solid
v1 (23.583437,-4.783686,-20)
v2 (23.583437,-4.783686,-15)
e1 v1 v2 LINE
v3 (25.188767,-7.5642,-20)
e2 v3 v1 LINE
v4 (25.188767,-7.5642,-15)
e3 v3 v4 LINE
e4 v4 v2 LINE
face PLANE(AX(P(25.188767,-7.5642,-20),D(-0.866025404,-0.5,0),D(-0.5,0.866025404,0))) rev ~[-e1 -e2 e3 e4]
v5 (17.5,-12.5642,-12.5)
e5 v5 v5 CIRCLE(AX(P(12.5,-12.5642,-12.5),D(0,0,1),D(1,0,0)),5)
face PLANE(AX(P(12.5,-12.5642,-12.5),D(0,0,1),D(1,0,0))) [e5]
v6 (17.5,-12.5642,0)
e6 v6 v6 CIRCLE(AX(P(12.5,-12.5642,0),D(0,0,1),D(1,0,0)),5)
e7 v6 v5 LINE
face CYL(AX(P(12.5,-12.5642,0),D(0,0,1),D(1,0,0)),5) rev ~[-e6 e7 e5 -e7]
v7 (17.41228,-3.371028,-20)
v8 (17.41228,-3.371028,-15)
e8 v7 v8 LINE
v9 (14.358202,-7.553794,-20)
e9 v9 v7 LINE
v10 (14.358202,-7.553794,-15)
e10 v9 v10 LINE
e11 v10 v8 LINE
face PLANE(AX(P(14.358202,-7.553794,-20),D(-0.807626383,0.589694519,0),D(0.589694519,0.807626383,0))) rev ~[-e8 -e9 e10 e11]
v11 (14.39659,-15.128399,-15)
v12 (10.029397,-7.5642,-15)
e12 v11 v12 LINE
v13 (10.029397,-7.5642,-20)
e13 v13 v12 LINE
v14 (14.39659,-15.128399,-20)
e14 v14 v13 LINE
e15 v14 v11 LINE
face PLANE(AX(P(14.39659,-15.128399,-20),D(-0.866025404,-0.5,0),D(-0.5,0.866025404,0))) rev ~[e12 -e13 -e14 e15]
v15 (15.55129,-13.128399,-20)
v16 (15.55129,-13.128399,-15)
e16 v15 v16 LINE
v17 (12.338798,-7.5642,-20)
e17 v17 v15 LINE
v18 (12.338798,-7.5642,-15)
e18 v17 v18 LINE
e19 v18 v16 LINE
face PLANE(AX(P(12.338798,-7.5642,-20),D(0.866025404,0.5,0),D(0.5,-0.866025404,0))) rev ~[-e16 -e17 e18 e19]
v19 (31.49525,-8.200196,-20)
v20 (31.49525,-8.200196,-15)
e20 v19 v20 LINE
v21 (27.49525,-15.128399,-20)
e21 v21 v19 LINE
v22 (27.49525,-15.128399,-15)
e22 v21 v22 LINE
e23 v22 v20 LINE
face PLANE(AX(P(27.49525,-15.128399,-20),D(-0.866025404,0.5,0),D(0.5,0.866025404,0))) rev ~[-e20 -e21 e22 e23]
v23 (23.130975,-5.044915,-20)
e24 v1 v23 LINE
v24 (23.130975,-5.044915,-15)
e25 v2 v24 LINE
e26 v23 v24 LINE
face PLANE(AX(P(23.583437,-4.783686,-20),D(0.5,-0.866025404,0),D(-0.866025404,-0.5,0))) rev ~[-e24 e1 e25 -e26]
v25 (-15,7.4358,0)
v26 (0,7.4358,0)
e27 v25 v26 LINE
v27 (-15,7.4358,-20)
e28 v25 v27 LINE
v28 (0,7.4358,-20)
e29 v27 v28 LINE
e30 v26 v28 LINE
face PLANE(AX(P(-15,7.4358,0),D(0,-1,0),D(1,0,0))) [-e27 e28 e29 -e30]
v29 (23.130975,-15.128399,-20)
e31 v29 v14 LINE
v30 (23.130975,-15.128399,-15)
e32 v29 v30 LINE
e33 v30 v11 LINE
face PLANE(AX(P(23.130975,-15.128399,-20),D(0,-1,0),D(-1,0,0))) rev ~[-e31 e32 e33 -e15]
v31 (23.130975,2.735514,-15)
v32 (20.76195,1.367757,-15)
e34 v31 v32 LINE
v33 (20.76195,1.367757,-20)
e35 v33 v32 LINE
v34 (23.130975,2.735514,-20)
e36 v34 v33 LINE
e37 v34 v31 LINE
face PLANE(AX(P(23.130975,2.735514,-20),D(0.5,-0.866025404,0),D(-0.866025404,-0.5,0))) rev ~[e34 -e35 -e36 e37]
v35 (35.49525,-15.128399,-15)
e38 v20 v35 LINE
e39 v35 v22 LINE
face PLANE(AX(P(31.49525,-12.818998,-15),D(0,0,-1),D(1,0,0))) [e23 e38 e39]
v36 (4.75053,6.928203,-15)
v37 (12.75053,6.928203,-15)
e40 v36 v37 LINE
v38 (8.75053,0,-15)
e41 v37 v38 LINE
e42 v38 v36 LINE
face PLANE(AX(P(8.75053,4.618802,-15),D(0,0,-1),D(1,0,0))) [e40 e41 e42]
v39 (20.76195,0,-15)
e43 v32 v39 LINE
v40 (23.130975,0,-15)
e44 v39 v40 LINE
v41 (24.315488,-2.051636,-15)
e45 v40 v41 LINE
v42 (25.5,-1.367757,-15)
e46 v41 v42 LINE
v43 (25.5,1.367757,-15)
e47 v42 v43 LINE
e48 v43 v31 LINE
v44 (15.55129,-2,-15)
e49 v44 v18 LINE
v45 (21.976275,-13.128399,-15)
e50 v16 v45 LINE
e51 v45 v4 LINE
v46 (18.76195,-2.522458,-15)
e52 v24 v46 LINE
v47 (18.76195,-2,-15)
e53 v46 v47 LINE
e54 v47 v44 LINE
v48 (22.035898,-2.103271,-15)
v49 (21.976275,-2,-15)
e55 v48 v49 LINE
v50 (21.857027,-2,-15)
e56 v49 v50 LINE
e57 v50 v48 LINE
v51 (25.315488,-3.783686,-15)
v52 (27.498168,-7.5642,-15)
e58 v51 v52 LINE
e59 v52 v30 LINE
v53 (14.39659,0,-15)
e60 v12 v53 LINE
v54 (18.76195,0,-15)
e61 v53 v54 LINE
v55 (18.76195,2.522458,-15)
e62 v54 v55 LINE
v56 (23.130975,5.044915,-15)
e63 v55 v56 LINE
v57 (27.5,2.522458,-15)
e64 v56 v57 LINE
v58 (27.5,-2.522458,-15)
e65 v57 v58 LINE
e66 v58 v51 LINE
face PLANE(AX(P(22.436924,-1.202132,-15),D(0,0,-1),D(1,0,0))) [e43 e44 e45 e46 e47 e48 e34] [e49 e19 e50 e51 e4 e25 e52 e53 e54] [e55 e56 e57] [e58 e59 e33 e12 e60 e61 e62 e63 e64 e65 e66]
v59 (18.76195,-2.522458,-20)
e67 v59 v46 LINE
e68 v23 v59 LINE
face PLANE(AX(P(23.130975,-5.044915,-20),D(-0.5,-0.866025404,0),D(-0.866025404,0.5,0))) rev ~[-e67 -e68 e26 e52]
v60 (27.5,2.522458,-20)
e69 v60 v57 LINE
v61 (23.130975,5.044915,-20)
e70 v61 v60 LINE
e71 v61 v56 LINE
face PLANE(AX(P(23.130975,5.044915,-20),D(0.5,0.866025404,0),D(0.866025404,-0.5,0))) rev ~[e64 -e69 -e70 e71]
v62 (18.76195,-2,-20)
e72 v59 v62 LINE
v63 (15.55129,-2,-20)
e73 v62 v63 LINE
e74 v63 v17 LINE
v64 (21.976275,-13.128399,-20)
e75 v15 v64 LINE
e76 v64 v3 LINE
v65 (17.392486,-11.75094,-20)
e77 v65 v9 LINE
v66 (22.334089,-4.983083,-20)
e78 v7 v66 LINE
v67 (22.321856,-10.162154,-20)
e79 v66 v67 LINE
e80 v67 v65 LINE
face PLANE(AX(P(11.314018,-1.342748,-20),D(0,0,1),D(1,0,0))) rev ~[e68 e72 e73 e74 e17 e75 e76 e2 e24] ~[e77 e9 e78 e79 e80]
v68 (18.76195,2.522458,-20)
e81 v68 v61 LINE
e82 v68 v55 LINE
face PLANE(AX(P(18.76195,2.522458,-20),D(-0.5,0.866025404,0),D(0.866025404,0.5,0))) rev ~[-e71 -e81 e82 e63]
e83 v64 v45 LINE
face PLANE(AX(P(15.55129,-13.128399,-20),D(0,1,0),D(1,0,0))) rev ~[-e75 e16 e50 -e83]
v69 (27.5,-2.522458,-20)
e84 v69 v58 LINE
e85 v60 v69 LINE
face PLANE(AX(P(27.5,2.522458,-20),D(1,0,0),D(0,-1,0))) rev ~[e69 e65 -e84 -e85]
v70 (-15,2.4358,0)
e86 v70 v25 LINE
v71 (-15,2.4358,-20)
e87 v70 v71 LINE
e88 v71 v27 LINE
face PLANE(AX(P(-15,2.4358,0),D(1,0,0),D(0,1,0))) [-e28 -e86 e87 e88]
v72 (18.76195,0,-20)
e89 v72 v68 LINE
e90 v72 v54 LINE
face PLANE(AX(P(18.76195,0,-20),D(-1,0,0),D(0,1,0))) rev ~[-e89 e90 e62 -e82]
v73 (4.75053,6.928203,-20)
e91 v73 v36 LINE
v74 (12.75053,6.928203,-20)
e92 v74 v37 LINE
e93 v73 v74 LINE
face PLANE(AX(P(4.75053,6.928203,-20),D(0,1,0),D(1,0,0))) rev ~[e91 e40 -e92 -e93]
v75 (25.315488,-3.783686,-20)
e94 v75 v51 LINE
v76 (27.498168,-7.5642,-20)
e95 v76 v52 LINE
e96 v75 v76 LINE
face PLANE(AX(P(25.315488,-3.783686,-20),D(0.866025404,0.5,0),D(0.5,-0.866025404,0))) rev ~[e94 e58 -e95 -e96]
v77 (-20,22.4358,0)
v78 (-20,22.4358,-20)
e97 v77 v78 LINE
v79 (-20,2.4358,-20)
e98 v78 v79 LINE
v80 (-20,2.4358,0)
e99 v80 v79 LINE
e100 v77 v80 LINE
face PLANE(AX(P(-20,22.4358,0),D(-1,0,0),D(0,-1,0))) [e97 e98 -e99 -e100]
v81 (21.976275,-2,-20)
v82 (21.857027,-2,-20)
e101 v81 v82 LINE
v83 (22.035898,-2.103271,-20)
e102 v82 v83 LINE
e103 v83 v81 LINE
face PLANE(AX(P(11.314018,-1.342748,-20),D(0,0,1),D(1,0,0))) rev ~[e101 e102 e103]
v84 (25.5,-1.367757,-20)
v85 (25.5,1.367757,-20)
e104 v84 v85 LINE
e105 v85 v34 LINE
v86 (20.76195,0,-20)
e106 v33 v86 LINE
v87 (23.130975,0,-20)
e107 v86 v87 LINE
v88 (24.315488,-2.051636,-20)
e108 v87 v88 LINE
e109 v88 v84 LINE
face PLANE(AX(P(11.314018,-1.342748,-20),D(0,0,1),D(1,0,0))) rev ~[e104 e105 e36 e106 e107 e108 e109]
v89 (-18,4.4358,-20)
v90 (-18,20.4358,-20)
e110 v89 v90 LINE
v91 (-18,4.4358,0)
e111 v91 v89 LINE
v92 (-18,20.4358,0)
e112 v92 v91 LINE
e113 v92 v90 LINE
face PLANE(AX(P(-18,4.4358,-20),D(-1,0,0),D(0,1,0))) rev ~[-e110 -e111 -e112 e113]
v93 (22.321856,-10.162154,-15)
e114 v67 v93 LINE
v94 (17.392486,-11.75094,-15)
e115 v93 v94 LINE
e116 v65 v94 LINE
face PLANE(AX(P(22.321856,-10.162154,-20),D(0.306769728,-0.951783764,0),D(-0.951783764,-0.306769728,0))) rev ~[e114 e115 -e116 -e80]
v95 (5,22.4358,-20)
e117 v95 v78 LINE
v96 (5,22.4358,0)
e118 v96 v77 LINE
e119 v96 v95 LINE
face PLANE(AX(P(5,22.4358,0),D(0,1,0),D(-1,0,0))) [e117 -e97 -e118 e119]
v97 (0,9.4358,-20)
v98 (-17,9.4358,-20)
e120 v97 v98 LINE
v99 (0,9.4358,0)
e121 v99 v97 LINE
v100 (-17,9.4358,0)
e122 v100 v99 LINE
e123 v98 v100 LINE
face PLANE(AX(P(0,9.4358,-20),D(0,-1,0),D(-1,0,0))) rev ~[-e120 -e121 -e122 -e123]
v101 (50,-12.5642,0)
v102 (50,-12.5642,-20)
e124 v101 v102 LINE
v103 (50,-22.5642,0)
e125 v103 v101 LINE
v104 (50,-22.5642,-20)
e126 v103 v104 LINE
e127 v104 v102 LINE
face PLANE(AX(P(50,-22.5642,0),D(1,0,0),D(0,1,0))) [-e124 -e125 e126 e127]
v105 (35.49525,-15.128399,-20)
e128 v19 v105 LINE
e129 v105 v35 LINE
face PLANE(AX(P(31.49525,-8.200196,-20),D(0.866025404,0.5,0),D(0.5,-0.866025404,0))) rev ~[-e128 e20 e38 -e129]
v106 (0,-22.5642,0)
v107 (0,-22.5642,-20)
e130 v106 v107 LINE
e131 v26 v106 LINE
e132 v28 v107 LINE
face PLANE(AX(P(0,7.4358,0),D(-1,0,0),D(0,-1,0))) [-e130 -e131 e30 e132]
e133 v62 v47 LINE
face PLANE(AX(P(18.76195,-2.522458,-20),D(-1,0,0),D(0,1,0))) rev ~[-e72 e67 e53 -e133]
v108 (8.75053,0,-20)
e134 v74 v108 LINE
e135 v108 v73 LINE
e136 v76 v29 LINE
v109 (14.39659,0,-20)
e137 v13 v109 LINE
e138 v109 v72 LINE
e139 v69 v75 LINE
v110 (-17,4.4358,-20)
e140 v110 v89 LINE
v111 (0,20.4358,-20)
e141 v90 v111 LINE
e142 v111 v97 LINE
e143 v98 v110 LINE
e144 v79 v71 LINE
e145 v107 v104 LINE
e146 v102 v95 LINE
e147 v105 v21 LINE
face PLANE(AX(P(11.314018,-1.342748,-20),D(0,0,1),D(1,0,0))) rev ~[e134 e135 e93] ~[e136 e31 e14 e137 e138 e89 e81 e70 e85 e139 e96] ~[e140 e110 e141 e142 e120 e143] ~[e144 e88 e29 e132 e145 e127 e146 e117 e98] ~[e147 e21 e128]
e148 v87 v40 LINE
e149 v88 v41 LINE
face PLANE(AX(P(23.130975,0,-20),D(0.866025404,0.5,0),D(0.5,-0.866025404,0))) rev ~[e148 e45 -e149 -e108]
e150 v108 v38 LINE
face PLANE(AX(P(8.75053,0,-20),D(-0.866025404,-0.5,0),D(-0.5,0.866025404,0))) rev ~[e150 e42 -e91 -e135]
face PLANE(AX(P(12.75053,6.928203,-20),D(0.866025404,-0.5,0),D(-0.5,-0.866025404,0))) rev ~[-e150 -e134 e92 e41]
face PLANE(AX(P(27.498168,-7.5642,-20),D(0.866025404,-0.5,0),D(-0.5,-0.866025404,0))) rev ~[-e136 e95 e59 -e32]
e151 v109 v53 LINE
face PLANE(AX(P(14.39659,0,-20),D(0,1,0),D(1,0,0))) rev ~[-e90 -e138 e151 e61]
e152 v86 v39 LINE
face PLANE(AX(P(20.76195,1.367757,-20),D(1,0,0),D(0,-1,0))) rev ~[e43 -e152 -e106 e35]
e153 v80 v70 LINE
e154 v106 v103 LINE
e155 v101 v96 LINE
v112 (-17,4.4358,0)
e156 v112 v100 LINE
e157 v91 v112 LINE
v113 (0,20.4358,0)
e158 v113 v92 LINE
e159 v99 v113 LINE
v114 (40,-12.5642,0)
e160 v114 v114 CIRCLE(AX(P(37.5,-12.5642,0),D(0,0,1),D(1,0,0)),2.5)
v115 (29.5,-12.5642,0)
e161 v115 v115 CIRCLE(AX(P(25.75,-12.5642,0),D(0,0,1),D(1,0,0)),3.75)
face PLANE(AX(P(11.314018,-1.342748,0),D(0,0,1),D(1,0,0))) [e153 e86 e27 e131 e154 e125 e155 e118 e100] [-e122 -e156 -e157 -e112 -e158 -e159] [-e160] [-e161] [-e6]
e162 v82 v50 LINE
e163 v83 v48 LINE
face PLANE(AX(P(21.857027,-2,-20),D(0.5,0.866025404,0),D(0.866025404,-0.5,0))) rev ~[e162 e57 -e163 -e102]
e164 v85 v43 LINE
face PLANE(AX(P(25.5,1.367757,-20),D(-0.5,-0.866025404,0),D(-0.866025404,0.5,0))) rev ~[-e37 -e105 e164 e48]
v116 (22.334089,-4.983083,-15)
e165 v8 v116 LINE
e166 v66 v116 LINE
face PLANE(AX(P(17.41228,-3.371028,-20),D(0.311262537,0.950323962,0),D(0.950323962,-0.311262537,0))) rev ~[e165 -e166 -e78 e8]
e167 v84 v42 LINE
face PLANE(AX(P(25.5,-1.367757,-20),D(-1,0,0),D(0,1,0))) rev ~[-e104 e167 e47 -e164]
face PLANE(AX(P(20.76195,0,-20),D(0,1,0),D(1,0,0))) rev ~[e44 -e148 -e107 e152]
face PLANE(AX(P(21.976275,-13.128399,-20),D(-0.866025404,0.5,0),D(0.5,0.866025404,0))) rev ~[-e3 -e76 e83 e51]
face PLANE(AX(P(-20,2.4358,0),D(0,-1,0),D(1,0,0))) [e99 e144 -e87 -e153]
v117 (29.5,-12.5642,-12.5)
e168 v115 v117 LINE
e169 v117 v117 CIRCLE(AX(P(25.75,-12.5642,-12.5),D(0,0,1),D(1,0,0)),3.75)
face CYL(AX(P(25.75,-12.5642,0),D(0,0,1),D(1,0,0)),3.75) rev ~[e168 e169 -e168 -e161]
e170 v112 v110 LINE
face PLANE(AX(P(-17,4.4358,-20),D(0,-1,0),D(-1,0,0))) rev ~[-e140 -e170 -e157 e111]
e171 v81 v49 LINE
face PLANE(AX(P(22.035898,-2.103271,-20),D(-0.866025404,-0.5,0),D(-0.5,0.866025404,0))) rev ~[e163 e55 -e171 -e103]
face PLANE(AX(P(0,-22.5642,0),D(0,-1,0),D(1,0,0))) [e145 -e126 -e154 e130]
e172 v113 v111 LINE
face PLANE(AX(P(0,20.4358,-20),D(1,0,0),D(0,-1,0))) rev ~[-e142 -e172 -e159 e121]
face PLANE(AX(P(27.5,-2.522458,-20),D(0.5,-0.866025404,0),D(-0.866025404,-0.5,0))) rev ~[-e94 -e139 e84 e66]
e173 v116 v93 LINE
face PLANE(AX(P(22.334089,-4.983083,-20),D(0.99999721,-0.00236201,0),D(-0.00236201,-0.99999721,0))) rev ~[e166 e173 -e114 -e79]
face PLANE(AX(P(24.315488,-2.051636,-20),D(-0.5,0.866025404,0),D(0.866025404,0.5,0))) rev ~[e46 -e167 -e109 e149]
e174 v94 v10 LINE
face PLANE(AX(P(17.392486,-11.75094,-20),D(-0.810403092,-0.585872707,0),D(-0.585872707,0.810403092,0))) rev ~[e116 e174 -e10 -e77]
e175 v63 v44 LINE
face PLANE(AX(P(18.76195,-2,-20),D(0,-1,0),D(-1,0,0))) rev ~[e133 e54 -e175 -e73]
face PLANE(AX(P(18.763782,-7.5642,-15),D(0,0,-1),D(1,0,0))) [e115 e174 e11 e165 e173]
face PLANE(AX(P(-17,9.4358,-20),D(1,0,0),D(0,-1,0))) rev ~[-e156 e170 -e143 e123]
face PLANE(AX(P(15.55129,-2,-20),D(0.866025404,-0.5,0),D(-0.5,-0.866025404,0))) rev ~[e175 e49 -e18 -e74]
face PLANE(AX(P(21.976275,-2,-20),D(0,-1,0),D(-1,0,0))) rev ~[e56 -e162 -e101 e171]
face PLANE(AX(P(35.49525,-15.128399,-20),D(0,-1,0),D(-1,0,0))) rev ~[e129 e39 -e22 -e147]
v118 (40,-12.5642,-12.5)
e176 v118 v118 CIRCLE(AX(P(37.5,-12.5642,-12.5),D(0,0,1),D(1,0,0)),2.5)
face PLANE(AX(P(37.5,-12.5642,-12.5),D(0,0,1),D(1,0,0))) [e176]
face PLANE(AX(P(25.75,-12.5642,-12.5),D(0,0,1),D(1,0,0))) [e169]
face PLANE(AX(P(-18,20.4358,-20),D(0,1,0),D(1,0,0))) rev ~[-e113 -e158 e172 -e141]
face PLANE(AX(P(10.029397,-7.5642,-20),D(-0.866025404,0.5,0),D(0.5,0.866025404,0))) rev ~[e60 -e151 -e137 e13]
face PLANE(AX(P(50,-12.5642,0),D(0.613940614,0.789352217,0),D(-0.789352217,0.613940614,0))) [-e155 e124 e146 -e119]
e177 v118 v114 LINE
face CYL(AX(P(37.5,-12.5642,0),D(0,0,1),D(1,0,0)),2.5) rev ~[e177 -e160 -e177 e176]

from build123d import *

# Parameters (mm, degrees)
F0_R     = 5
F0_R_2   = 3.75
F0_R_3   = 2.5
F1_DEPTH = 20
F2_DEPTH = 12.5
F4_DEPTH = 5
F5_DEPTH = 20.001


with BuildPart() as f1:
    # F0 (on Top) → F1 (new body)
    with BuildSketch(Plane.XY):
        Polygon((0, 7.4358002841), (0, -22.5641997159), (50, -22.5641997159), (50, -12.5641997159), (5, 22.4358002841), (-20, 22.4358002841), (-20, 2.4358002841), (-15, 2.4358002841), (-15, 7.4358002841), align=None)
        with Locations((12.5, -12.5641997159)):
            Circle(F0_R, mode=Mode.SUBTRACT)
        with Locations((25.75, -12.5641997159)):
            Circle(F0_R_2, mode=Mode.SUBTRACT)
        with Locations((37.5, -12.5641997159)):
            Circle(F0_R_3, mode=Mode.SUBTRACT)
        with Locations((12.5, -12.5641997159)):
            Circle(F0_R)
        with Locations((25.75, -12.5641997159)):
            Circle(F0_R_2)
        with Locations((37.5, -12.5641997159)):
            Circle(F0_R_3)
    extrude(amount=-F1_DEPTH)

    # F0 (on Top) → F2 (cut, symmetric)
    with BuildSketch(Plane.XY):
        with Locations((12.5, -12.5641997159)):
            Circle(F0_R)
        with Locations((25.75, -12.5641997159)):
            Circle(F0_R_2)
        with Locations((37.5, -12.5641997159)):
            Circle(F0_R_3)
    extrude(amount=F2_DEPTH, both=True, mode=Mode.SUBTRACT)

    # F3 (on face) → F4 (cut)
    with BuildSketch(Plane(origin=(0, 0, -20), x_dir=(1, 0, 0), z_dir=(0, 0, -1))):
        Polygon((20.7619503973, 0), (23.1309751987, 0), (24.3154875993, 2.0516356601), (23.1309751987, 2.7355142135), (22.0358983849, 2.1032713203), (21.9762746603, 2), (21.8570272111, 2), (20.7619503973, 1.3677571068), align=None)
        Polygon((20.7619503973, -1.3677571068), (20.7619503973, 0), (18.7619503973, 0), (18.7619503973, -2.5224576451), (23.1309751987, -5.0449152903), (27.5, -2.5224576451), (27.5, 2.5224576451), (25.3154875993, 3.7836864677), (24.3154875993, 2.0516356601), (25.5, 1.3677571068), (25.5, -1.3677571068), (23.1309751987, -2.7355142135), align=None)
        Polygon((18.7619503973, 0), (20.7619503973, 0), (20.7619503973, 1.3677571068), (21.8570272111, 2), (18.7619503973, 2), align=None)
        Polygon((23.1309751987, 2.7355142135), (24.3154875993, 2.0516356601), (25.3154875993, 3.7836864677), (23.5834367918, 4.7836864677), (22.0358983849, 2.1032713203), align=None)
        Polygon((14.3965897144, 0), (18.7619503973, 0), (18.7619503973, 2), (15.5512902527, 2), (12.338798049, 7.5641997159), (15.5512902527, 13.1283994317), (21.9762746603, 13.1283994317), (25.1887668641, 7.5641997159), (23.5834367918, 4.7836864677), (25.3154875993, 3.7836864677), (27.4981679408, 7.5641997159), (23.1309751987, 15.1283994317), (14.3965897144, 15.1283994317), (10.0293969722, 7.5641997159), align=None)
        Polygon((18.7619503973, 2.5224576451), (18.7619503973, 2), (21.8570272111, 2), (22.0358983849, 2.1032713203), (23.5834367918, 4.7836864677), (23.1309751987, 5.0449152903), align=None)
        Polygon((22.3340887545, 4.9830829416), (22.3218557052, 10.162153838), (17.3924863607, 11.7509404388), (14.358201612, 7.5537936626), (17.4122798502, 3.3710276983), align=None)
        Polygon((35.4952501059, 15.1283994317), (27.4952501059, 15.1283994317), (31.4952501059, 8.2001962014), align=None)
        Polygon((12.7505299598, -6.9282032303), (8.7505299598, 0), (4.7505299598, -6.9282032303), align=None)
        Polygon((0, -9.4358002841), (-15, -9.4358002841), (-17, -9.4358002841), (-17, -4.4358002841), (-18, -4.4358002841), (-18, -20.4358002841), (-15, -20.4358002841), (0, -20.4358002841), align=None)
    extrude(amount=-F4_DEPTH, mode=Mode.SUBTRACT)

    # F3 (on face) → F5 (cut, through all)
    with BuildSketch(Plane(origin=(0, 0, -20), x_dir=(1, 0, 0), z_dir=(0, 0, -1))):
        Polygon((0, -9.4358002841), (-15, -9.4358002841), (-17, -9.4358002841), (-17, -4.4358002841), (-18, -4.4358002841), (-18, -20.4358002841), (-15, -20.4358002841), (0, -20.4358002841), align=None)
    extrude(amount=-F5_DEPTH, mode=Mode.SUBTRACT)


solid = f1.part
